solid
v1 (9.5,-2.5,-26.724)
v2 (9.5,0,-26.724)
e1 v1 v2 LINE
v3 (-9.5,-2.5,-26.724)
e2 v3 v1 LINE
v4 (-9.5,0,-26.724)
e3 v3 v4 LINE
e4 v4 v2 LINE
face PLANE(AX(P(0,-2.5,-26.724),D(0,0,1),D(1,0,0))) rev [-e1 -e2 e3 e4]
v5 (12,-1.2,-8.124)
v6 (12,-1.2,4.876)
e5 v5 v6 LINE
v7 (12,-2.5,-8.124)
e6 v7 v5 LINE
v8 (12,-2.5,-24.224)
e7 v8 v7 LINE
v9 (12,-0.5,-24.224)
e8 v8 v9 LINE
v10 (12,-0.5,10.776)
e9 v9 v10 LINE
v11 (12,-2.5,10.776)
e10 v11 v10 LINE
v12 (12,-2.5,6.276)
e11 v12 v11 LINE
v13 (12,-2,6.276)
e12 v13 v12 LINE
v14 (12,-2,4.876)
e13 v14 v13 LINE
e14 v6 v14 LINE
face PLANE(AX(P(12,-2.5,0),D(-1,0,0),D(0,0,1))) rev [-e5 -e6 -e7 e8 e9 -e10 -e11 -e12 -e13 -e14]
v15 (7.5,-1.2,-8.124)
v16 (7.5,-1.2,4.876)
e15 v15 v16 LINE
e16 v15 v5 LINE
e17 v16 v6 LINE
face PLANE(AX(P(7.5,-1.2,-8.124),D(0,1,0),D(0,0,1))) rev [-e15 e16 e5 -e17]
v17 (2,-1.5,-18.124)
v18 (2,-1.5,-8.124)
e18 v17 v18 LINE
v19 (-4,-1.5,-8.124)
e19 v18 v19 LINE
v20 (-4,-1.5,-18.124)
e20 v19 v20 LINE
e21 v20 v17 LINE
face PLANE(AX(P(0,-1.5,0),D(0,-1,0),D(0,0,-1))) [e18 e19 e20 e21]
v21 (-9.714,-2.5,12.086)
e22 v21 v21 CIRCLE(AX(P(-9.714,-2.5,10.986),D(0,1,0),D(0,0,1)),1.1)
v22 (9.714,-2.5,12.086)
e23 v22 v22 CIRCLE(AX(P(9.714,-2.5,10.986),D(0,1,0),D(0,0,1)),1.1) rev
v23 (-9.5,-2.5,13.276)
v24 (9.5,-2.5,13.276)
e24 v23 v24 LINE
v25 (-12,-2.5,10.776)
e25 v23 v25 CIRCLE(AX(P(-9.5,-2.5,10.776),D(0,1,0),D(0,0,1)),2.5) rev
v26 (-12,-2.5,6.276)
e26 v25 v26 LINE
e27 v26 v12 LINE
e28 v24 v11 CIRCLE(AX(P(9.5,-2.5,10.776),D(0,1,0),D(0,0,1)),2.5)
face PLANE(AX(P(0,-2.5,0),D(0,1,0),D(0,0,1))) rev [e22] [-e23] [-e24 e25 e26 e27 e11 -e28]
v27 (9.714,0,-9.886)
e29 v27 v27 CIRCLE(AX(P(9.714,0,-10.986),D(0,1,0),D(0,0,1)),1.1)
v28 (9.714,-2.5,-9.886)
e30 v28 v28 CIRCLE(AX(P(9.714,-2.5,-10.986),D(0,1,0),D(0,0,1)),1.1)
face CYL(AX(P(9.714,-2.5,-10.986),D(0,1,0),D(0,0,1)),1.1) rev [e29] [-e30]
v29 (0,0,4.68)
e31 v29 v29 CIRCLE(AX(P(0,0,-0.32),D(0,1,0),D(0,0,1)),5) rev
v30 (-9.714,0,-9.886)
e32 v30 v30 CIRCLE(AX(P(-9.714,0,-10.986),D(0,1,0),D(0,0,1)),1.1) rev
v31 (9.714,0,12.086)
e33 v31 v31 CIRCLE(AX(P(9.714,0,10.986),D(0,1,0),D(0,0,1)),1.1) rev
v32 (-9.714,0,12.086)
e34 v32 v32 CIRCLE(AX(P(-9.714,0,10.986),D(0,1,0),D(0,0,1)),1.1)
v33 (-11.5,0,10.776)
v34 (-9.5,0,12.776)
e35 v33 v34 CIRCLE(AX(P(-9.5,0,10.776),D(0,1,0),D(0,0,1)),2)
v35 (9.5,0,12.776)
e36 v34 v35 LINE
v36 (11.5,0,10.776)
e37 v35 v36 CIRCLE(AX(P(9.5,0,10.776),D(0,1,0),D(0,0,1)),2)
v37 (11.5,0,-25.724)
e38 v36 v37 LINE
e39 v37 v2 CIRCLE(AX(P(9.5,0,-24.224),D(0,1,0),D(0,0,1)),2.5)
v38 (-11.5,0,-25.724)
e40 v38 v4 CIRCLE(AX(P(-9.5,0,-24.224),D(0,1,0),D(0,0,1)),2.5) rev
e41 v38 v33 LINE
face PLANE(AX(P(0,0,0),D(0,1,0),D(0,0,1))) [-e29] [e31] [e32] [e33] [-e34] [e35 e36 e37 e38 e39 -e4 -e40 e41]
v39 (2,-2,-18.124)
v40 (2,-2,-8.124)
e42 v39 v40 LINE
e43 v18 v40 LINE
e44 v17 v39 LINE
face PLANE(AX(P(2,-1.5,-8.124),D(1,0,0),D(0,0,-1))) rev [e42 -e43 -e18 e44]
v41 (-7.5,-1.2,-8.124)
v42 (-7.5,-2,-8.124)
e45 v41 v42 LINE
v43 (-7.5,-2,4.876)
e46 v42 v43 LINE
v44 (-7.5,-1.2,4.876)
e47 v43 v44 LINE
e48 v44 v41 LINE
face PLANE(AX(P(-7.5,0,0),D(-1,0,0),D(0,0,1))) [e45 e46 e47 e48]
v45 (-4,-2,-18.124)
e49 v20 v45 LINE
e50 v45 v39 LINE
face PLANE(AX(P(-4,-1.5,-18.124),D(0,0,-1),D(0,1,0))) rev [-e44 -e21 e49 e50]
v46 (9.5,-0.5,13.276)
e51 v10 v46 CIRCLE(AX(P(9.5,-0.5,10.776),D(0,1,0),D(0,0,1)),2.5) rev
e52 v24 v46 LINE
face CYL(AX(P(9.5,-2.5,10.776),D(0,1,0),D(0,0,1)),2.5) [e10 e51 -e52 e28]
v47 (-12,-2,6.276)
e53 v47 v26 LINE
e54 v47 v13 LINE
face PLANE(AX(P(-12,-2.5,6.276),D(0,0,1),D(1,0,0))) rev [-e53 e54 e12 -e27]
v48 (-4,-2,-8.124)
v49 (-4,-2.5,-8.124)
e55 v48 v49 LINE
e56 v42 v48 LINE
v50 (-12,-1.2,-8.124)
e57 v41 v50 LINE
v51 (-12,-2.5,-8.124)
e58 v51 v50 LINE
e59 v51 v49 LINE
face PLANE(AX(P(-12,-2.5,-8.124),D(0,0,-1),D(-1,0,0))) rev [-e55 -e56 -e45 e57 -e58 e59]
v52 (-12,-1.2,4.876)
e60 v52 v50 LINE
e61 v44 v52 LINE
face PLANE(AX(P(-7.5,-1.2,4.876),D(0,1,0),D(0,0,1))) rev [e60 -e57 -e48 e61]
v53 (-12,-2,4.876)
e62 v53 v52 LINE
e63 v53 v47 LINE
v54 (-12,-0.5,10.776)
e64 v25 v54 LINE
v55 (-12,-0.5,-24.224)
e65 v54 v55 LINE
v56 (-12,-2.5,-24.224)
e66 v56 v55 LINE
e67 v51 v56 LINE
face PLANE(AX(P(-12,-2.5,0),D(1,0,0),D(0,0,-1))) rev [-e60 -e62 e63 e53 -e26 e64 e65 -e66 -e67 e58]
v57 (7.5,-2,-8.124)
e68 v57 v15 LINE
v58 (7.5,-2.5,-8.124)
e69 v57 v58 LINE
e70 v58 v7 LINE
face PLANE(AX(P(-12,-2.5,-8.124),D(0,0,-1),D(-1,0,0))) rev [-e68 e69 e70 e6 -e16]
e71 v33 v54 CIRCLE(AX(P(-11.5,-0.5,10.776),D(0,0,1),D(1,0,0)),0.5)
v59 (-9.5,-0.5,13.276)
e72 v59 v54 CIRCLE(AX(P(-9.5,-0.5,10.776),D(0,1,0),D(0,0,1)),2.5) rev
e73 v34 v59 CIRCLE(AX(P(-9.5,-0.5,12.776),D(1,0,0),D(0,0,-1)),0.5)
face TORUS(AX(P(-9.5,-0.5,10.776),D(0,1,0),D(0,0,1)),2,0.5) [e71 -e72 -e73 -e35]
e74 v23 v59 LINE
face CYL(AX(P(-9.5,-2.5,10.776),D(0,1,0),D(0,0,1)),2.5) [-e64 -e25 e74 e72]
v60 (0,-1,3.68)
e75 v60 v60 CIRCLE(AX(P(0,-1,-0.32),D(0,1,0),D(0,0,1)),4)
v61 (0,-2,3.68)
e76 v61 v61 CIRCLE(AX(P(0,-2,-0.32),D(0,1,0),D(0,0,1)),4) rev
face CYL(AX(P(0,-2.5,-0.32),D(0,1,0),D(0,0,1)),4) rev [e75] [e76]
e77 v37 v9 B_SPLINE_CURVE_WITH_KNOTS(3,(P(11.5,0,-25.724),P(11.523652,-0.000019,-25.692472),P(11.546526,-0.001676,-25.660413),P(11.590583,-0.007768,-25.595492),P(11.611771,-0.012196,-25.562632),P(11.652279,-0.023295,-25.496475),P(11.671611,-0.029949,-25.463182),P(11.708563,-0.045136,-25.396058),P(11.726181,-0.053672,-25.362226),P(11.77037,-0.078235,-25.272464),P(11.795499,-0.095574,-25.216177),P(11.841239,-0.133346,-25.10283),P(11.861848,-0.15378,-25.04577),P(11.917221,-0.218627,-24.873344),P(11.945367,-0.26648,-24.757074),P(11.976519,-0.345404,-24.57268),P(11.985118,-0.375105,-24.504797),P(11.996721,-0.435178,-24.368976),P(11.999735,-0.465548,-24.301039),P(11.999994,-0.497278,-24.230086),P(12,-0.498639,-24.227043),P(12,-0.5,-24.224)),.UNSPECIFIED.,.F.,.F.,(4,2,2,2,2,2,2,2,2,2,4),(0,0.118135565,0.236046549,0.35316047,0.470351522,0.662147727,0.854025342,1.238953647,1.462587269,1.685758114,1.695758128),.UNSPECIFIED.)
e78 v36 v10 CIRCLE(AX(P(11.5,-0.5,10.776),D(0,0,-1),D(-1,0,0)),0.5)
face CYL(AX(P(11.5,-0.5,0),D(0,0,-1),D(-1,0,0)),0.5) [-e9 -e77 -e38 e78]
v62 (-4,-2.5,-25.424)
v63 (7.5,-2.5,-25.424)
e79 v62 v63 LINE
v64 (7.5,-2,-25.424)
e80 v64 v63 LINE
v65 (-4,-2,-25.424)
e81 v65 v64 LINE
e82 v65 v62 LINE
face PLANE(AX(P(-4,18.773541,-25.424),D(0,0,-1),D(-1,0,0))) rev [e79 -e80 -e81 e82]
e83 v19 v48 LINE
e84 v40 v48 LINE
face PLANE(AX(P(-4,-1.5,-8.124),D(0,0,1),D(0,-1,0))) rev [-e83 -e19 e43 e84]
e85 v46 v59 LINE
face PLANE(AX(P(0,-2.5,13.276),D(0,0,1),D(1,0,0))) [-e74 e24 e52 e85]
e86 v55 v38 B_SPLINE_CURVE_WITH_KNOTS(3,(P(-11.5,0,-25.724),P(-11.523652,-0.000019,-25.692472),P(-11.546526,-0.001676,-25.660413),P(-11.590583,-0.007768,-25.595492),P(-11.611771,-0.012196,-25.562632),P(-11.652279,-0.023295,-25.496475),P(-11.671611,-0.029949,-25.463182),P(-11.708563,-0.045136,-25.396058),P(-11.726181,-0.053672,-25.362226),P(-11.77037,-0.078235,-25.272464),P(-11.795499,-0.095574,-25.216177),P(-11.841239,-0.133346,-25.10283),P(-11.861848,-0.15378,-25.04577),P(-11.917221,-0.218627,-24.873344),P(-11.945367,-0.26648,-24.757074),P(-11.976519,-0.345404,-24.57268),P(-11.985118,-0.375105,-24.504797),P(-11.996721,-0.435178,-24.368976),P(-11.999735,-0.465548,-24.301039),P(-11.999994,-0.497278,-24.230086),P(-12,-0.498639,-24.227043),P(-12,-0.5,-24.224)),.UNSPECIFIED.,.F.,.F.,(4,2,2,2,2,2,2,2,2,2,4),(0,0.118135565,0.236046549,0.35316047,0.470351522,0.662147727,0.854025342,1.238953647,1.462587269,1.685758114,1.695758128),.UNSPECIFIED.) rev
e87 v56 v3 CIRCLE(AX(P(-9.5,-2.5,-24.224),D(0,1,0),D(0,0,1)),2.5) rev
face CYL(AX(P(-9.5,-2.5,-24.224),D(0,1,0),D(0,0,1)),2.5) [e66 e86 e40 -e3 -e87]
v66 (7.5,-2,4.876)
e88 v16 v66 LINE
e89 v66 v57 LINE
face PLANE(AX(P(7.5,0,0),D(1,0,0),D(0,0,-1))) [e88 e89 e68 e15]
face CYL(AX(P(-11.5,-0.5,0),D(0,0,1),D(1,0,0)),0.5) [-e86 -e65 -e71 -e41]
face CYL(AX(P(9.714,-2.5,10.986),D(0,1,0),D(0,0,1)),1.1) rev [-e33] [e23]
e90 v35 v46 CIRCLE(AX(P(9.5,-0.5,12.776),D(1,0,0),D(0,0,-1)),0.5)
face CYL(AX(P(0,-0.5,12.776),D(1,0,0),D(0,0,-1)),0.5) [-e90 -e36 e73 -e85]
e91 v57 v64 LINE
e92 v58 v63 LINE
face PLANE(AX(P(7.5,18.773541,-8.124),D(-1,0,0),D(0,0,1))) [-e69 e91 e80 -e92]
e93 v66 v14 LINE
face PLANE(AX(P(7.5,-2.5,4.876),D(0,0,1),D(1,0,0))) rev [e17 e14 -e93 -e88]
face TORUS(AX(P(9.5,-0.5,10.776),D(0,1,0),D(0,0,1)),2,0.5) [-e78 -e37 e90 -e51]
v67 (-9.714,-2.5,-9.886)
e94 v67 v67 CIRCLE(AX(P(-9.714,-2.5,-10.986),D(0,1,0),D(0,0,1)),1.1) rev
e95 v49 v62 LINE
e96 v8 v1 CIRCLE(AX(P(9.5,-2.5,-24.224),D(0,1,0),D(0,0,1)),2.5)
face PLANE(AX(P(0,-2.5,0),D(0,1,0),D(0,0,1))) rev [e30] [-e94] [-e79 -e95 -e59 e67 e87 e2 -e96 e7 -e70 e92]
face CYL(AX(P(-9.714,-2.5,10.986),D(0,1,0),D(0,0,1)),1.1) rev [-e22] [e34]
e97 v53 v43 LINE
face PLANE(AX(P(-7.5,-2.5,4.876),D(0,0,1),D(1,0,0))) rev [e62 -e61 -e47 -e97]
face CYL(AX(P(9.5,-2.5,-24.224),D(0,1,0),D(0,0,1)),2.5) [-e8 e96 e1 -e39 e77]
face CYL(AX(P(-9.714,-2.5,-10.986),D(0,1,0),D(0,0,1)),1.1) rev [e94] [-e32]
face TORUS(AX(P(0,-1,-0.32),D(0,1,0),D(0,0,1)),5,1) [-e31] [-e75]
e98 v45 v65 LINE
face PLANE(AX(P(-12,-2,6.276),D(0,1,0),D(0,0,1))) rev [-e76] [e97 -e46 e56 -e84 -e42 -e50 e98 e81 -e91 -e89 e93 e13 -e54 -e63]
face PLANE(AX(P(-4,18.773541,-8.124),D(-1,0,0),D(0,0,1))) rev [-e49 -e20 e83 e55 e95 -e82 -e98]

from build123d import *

# Parameters (mm, degrees)
SKETCH_1_R           = 1.1
SKETCH_1_R_2         = 4
EXTRUDE_1_DEPTH      = 2.5
SKETCH_2_W           = 14.4
SKETCH_2_H           = 0.5
CUT_EXTRUDE_1_DEPTH  = 37.005863078
SKETCH_3_W           = 13
SKETCH_3_H           = 1.3
CUT_EXTRUDE_2_DEPTH  = 4.5
SKETCH_4_W           = 13
SKETCH_4_H           = 1.3
CUT_EXTRUDE_3_DEPTH  = 4.5
SKETCH_5_W           = 11.5
SKETCH_5_H           = 17.3
CUT_EXTRUDE_11_DEPTH = 0.5
SKETCH_6_W           = 6
SKETCH_6_H           = 10
CUT_EXTRUDE_12_DEPTH = 0.5
FILLET_1_R           = 0.5
FILLET_2_R           = 1


with BuildPart() as part:
    # 草图1 → 凸台-拉伸1 (new body)
    with BuildSketch(Plane(origin=(0, 0, 0), x_dir=(1, 0, 0), z_dir=(0, 1, 0))):
        with BuildLine():
            Line((-12, 24.224), (-12, -10.776))
            ThreePointArc((-12, -10.776), (-11.267766953, -12.543766953), (-9.5, -13.276))
            Line((-9.5, -13.276), (9.5, -13.276))
            ThreePointArc((9.5, -13.276), (11.267766953, -12.543766953), (12, -10.776))
            Line((12, -10.776), (12, 24.224))
            ThreePointArc((12, 24.224), (11.267766953, 25.991766953), (9.5, 26.724))
            Line((9.5, 26.724), (-9.5, 26.724))
            ThreePointArc((-9.5, 26.724), (-11.267766953, 25.991766953), (-12, 24.224))
        make_face()
        with Locations(Location((-9.714, -10.986, 0), (0, 0, 270))):
            Circle(SKETCH_1_R, mode=Mode.SUBTRACT)
        with Locations(Location((0, 0.32, 0), (0, 0, 270))):
            Circle(SKETCH_1_R_2, mode=Mode.SUBTRACT)
        with Locations(Location((9.714, -10.986, 0), (0, 0, 270))):
            Circle(SKETCH_1_R, mode=Mode.SUBTRACT)
        with Locations(Location((9.714, 10.986, 0), (0, 0, 270))):
            Circle(SKETCH_1_R, mode=Mode.SUBTRACT)
        with Locations(Location((-9.714, 10.986, 0), (0, 0, 270))):
            Circle(SKETCH_1_R, mode=Mode.SUBTRACT)
    extrude(amount=-EXTRUDE_1_DEPTH)

    # 草图2 → 切除-拉伸1 (cut, through all)
    with BuildSketch(Plane(origin=(12, 0, 0), x_dir=(0, 0, -1), z_dir=(1, 0, 0))):
        with Locations((0.924, -2.25)):
            Rectangle(SKETCH_2_W, SKETCH_2_H)
    extrude(amount=-CUT_EXTRUDE_1_DEPTH, mode=Mode.SUBTRACT)

    # 草图3 → 切除-拉伸2 (cut)
    with BuildSketch(Plane(origin=(12, 0, 0), x_dir=(0, 0, -1), z_dir=(1, 0, 0))):
        with Locations((1.624, -1.85)):
            Rectangle(SKETCH_3_W, SKETCH_3_H)
    extrude(amount=-CUT_EXTRUDE_2_DEPTH, mode=Mode.SUBTRACT)

    # 草图4 → 切除-拉伸3 (cut)
    with BuildSketch(Plane.ZY.offset(12)):
        with Locations((-1.624, -1.85)):
            Rectangle(SKETCH_4_W, SKETCH_4_H)
    extrude(amount=-CUT_EXTRUDE_3_DEPTH, mode=Mode.SUBTRACT)

    # 草图5 → 切除-拉伸11 (cut)
    with BuildSketch(Plane.XZ.offset(2.5)):
        with Locations((1.75, -16.774)):
            Rectangle(SKETCH_5_W, SKETCH_5_H)
    extrude(amount=-CUT_EXTRUDE_11_DEPTH, mode=Mode.SUBTRACT)

    # 草图6 → 切除-拉伸12 (cut)
    with BuildSketch(Plane.XZ.offset(2)):
        with Locations((-1, -13.124)):
            Rectangle(SKETCH_6_W, SKETCH_6_H)
    extrude(amount=-CUT_EXTRUDE_12_DEPTH, mode=Mode.SUBTRACT)

    # 圆角1
    # the kernel refuses this fillet: 0.5 mm, written as the material it takes off along each edge
    with BuildSketch(Plane(origin=(-9.5, 0, 13.276), x_dir=(0, 0, -1), z_dir=(1, 0, 0))) as fillet_1_piece_1:
        with BuildLine():
            CenterArc((FILLET_1_R, -FILLET_1_R), FILLET_1_R, 90, 90)
            Line((0, -FILLET_1_R), (-FILLET_1_R * 0.02, -FILLET_1_R))
            Line((-FILLET_1_R * 0.02, -FILLET_1_R), (-FILLET_1_R * 0.02, FILLET_1_R * 0.02))
            Line((-FILLET_1_R * 0.02, FILLET_1_R * 0.02), (FILLET_1_R, FILLET_1_R * 0.02))
            Line((FILLET_1_R, FILLET_1_R * 0.02), (FILLET_1_R, 0))
        make_face()
    extrude(amount=19, mode=Mode.SUBTRACT)
    with BuildSketch(Plane(origin=(-9.5, 0, 10.776), x_dir=(-1, 0, 0), z_dir=(0, 0, -1))) as fillet_1_piece_2:
        with BuildLine():
            CenterArc((2.5 - FILLET_1_R, -FILLET_1_R), FILLET_1_R, 0, 90)
            Line((2.5, -FILLET_1_R), (2.5 + FILLET_1_R * 0.02, -FILLET_1_R))
            Line((2.5 + FILLET_1_R * 0.02, -FILLET_1_R), (2.5 + FILLET_1_R * 0.02, FILLET_1_R * 0.02))
            Line((2.5 + FILLET_1_R * 0.02, FILLET_1_R * 0.02), (2.5 - FILLET_1_R, FILLET_1_R * 0.02))
            Line((2.5 - FILLET_1_R, FILLET_1_R * 0.02), (2.5 - FILLET_1_R, 0))
        make_face()
    revolve(axis=Axis((-9.5, 0, 10.776), (0, 1, 0)), revolution_arc=90, mode=Mode.SUBTRACT)
    with BuildSketch(Plane(origin=(-12, 0, -27.224), x_dir=(0, -1, 0), z_dir=(0, 0, 1))) as fillet_1_piece_3:
        with BuildLine():
            CenterArc((FILLET_1_R, FILLET_1_R), FILLET_1_R, 180, 90)
            Line((0, FILLET_1_R), (-FILLET_1_R * 0.02, FILLET_1_R))
            Line((-FILLET_1_R * 0.02, FILLET_1_R), (-FILLET_1_R * 0.02, -FILLET_1_R * 0.02))
            Line((-FILLET_1_R * 0.02, -FILLET_1_R * 0.02), (FILLET_1_R, -FILLET_1_R * 0.02))
            Line((FILLET_1_R, -FILLET_1_R * 0.02), (FILLET_1_R, 0))
        make_face()
    extrude(amount=38, mode=Mode.SUBTRACT)
    with BuildSketch(Plane(origin=(12, 0, 10.776), x_dir=(-1, 0, 0), z_dir=(0, 0, -1))) as fillet_1_piece_4:
        with BuildLine():
            CenterArc((FILLET_1_R, -FILLET_1_R), FILLET_1_R, 90, 90)
            Line((0, -FILLET_1_R), (-FILLET_1_R * 0.02, -FILLET_1_R))
            Line((-FILLET_1_R * 0.02, -FILLET_1_R), (-FILLET_1_R * 0.02, FILLET_1_R * 0.02))
            Line((-FILLET_1_R * 0.02, FILLET_1_R * 0.02), (FILLET_1_R, FILLET_1_R * 0.02))
            Line((FILLET_1_R, FILLET_1_R * 0.02), (FILLET_1_R, 0))
        make_face()
    extrude(amount=38, mode=Mode.SUBTRACT)
    with BuildSketch(Plane(origin=(9.5, 0, 10.776), x_dir=(0, 0, 1), z_dir=(-1, 0, 0))) as fillet_1_piece_5:
        with BuildLine():
            CenterArc((2.5 - FILLET_1_R, -FILLET_1_R), FILLET_1_R, 0, 90)
            Line((2.5, -FILLET_1_R), (2.5 + FILLET_1_R * 0.02, -FILLET_1_R))
            Line((2.5 + FILLET_1_R * 0.02, -FILLET_1_R), (2.5 + FILLET_1_R * 0.02, FILLET_1_R * 0.02))
            Line((2.5 + FILLET_1_R * 0.02, FILLET_1_R * 0.02), (2.5 - FILLET_1_R, FILLET_1_R * 0.02))
            Line((2.5 - FILLET_1_R, FILLET_1_R * 0.02), (2.5 - FILLET_1_R, 0))
        make_face()
    revolve(axis=Axis((9.5, 0, 10.776), (0, 1, 0)), revolution_arc=90, mode=Mode.SUBTRACT)

    # 圆角2
    fillet_2_edges = [part.edges().sort_by_distance(p)[0] for p in [
        (0, 0, -4.32),
    ]]
    fillet(fillet_2_edges, radius=FILLET_2_R)


solid = part.part
